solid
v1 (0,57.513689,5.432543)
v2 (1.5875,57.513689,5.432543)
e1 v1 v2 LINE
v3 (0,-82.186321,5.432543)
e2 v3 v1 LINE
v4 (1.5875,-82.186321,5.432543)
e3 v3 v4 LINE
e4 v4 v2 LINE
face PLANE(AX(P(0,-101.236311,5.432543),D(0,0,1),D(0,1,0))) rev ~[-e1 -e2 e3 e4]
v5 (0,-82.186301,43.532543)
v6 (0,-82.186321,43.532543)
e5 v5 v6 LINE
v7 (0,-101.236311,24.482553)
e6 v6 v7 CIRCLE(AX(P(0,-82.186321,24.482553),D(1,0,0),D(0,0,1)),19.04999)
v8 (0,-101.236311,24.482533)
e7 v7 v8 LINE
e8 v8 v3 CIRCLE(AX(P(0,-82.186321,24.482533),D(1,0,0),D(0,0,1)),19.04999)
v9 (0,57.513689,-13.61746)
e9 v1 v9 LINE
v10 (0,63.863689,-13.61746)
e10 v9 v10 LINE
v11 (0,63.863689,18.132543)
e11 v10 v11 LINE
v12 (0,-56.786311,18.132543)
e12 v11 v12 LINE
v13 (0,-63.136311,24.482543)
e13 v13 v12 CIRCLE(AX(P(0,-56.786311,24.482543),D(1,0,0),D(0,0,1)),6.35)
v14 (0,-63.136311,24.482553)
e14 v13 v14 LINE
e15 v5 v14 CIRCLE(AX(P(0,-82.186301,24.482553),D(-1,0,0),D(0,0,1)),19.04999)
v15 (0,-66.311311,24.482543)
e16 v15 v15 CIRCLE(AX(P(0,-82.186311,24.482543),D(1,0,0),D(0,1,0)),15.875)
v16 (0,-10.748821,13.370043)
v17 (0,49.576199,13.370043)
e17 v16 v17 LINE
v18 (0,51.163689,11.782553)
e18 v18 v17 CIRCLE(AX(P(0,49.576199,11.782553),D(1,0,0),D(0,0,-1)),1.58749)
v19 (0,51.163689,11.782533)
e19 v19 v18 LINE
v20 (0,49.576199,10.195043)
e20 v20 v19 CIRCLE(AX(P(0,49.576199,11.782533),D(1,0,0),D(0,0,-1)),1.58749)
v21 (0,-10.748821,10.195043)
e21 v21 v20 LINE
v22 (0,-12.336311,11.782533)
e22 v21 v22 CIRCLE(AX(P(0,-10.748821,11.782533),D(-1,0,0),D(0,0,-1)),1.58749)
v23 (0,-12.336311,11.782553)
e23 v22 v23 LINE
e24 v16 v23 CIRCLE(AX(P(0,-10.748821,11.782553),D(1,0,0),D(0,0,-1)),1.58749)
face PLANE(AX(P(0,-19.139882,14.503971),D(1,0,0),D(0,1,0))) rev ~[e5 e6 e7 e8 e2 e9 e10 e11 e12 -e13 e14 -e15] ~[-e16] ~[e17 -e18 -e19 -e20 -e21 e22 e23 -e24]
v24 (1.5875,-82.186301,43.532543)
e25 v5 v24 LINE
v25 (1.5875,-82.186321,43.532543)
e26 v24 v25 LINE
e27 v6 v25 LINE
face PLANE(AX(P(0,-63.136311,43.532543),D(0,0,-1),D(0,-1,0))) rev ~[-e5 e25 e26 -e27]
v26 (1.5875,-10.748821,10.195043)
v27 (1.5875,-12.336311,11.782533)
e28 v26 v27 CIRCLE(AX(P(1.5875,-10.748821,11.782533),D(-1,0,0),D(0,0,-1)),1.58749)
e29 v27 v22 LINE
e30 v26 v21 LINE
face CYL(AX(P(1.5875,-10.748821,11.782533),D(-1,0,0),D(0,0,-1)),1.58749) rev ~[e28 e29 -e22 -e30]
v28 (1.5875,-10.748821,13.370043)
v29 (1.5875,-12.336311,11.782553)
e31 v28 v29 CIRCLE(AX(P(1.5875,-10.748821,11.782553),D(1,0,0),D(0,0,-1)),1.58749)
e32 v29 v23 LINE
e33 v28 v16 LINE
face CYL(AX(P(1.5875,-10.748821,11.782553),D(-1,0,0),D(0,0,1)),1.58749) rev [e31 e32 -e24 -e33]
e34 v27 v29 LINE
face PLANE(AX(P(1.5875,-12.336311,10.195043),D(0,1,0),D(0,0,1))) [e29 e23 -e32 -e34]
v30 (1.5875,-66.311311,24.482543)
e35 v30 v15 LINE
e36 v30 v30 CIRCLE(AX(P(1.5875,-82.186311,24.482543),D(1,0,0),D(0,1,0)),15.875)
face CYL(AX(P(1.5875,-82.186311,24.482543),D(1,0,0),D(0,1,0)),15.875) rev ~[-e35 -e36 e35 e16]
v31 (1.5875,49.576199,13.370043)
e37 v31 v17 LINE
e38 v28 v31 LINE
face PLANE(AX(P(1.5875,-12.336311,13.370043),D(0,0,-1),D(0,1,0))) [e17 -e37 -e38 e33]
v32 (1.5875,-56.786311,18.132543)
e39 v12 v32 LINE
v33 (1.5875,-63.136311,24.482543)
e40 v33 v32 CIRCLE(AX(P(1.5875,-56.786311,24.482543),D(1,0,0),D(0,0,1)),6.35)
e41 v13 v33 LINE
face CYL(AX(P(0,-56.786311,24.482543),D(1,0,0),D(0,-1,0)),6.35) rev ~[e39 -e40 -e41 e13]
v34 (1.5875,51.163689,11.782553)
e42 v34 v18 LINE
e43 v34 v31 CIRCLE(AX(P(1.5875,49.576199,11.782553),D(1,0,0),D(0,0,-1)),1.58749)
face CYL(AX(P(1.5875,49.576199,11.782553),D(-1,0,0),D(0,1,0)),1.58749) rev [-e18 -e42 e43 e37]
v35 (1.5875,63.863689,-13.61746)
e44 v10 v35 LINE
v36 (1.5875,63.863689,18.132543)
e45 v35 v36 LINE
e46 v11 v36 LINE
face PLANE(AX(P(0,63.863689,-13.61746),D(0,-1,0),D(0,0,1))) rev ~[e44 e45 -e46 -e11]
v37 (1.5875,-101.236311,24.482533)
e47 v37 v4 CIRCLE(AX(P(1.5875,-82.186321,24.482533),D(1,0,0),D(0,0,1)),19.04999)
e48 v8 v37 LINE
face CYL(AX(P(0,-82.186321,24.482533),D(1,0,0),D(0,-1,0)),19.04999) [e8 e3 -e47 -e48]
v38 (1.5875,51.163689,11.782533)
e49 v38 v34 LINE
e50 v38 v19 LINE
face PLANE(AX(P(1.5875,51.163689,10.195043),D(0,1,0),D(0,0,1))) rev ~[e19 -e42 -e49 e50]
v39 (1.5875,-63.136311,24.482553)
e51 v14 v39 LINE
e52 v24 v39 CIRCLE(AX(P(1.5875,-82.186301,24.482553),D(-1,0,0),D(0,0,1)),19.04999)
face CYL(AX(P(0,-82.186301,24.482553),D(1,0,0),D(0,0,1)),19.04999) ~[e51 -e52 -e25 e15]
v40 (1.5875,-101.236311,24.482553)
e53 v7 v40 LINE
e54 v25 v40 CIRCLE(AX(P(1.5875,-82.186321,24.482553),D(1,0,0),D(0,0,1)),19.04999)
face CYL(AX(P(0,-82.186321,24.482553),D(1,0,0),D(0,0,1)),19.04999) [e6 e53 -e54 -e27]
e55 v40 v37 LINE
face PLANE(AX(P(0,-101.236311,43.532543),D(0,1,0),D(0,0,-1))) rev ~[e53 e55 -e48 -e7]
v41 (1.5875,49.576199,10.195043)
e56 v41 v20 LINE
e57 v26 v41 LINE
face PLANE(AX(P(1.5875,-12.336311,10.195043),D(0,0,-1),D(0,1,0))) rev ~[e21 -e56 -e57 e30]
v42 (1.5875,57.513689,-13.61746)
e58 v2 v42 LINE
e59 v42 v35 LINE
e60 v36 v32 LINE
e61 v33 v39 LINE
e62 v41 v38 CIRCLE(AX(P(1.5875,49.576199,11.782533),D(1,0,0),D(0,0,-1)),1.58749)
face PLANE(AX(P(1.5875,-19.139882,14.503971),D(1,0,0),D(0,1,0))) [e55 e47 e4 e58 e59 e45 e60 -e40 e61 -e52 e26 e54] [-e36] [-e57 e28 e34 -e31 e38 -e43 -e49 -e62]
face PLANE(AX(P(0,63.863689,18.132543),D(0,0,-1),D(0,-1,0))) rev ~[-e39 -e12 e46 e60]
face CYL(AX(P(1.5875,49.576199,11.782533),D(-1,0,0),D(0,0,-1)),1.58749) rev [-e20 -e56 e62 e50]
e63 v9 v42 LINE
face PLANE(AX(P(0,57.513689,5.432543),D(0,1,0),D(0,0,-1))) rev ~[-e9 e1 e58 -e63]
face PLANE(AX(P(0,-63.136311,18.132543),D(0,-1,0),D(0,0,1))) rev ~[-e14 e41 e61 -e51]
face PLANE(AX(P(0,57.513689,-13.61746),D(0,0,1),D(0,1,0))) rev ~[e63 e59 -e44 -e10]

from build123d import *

# Parameters (mm, degrees)
F1_DEPTH = 1.5875
F2_R     = 19.04999
F3_R     = 6.35
F4_R     = 15.875
F5_DEPTH = 25.4
F6_W     = 63.5
F6_H     = 3.175
F7_DEPTH = 25.4
F8_R     = 1.58749


# Not quite as in the source:
# - a fillet or chamfer is up to 0.001 mm smaller than in the source, because OpenCascade refuses the exact size


with BuildPart() as f1:
    # F0 (on Right) → F1 (new body)
    with BuildSketch(Plane.YZ):
        Polygon((-63.1363113923, 43.5325428513), (-101.2363113923, 43.5325428513), (-101.2363113923, 5.4325428513), (57.5136886077, 5.4325428513), (57.5136886077, -13.6174602094), (63.8636886077, -13.6174602094), (63.8636886077, 18.1325428513), (-63.1363113923, 18.1325428513), align=None)
    extrude(amount=F1_DEPTH)

    # F2 (radius 19.05 in the source; OpenCascade refuses exactly that, so slightly less here)
    f2_edges = [f1.edges().sort_by_distance(p)[0] for p in [
        (0.79375, -63.136311, 43.532543),
        (0.79375, -101.236311, 43.532543),
        (0.79375, -101.236311, 5.432543),
    ]]
    fillet(f2_edges, radius=F2_R)

    # F3
    f3_edges = [f1.edges().sort_by_distance(p)[0] for p in [
        (0.79375, -63.136311, 18.132543),
    ]]
    fillet(f3_edges, radius=F3_R)

    # F4 (on face) → F5 (cut)
    with BuildSketch(Plane.YZ.offset(1.5875)):
        with Locations((-82.1863113923, 24.4825428513)):
            Circle(F4_R)
    extrude(amount=-F5_DEPTH, mode=Mode.SUBTRACT)

    # F6 (on face) → F7 (cut)
    with BuildSketch(Plane.YZ.offset(1.5875)):
        with Locations((19.4136886077, 11.7825428513)):
            Rectangle(F6_W, F6_H)
    extrude(amount=-F7_DEPTH, mode=Mode.SUBTRACT)

    # F8 (radius 1.5875 in the source; OpenCascade refuses exactly that, so slightly less here)
    f8_edges = [f1.edges().sort_by_distance(p)[0] for p in [
        (0.79375, -12.336311, 13.370043),
        (0.79375, -12.336311, 10.195043),
        (0.79375, 51.163689, 10.195043),
        (0.79375, 51.163689, 13.370043),
    ]]
    fillet(f8_edges, radius=F8_R)


solid = f1.part
